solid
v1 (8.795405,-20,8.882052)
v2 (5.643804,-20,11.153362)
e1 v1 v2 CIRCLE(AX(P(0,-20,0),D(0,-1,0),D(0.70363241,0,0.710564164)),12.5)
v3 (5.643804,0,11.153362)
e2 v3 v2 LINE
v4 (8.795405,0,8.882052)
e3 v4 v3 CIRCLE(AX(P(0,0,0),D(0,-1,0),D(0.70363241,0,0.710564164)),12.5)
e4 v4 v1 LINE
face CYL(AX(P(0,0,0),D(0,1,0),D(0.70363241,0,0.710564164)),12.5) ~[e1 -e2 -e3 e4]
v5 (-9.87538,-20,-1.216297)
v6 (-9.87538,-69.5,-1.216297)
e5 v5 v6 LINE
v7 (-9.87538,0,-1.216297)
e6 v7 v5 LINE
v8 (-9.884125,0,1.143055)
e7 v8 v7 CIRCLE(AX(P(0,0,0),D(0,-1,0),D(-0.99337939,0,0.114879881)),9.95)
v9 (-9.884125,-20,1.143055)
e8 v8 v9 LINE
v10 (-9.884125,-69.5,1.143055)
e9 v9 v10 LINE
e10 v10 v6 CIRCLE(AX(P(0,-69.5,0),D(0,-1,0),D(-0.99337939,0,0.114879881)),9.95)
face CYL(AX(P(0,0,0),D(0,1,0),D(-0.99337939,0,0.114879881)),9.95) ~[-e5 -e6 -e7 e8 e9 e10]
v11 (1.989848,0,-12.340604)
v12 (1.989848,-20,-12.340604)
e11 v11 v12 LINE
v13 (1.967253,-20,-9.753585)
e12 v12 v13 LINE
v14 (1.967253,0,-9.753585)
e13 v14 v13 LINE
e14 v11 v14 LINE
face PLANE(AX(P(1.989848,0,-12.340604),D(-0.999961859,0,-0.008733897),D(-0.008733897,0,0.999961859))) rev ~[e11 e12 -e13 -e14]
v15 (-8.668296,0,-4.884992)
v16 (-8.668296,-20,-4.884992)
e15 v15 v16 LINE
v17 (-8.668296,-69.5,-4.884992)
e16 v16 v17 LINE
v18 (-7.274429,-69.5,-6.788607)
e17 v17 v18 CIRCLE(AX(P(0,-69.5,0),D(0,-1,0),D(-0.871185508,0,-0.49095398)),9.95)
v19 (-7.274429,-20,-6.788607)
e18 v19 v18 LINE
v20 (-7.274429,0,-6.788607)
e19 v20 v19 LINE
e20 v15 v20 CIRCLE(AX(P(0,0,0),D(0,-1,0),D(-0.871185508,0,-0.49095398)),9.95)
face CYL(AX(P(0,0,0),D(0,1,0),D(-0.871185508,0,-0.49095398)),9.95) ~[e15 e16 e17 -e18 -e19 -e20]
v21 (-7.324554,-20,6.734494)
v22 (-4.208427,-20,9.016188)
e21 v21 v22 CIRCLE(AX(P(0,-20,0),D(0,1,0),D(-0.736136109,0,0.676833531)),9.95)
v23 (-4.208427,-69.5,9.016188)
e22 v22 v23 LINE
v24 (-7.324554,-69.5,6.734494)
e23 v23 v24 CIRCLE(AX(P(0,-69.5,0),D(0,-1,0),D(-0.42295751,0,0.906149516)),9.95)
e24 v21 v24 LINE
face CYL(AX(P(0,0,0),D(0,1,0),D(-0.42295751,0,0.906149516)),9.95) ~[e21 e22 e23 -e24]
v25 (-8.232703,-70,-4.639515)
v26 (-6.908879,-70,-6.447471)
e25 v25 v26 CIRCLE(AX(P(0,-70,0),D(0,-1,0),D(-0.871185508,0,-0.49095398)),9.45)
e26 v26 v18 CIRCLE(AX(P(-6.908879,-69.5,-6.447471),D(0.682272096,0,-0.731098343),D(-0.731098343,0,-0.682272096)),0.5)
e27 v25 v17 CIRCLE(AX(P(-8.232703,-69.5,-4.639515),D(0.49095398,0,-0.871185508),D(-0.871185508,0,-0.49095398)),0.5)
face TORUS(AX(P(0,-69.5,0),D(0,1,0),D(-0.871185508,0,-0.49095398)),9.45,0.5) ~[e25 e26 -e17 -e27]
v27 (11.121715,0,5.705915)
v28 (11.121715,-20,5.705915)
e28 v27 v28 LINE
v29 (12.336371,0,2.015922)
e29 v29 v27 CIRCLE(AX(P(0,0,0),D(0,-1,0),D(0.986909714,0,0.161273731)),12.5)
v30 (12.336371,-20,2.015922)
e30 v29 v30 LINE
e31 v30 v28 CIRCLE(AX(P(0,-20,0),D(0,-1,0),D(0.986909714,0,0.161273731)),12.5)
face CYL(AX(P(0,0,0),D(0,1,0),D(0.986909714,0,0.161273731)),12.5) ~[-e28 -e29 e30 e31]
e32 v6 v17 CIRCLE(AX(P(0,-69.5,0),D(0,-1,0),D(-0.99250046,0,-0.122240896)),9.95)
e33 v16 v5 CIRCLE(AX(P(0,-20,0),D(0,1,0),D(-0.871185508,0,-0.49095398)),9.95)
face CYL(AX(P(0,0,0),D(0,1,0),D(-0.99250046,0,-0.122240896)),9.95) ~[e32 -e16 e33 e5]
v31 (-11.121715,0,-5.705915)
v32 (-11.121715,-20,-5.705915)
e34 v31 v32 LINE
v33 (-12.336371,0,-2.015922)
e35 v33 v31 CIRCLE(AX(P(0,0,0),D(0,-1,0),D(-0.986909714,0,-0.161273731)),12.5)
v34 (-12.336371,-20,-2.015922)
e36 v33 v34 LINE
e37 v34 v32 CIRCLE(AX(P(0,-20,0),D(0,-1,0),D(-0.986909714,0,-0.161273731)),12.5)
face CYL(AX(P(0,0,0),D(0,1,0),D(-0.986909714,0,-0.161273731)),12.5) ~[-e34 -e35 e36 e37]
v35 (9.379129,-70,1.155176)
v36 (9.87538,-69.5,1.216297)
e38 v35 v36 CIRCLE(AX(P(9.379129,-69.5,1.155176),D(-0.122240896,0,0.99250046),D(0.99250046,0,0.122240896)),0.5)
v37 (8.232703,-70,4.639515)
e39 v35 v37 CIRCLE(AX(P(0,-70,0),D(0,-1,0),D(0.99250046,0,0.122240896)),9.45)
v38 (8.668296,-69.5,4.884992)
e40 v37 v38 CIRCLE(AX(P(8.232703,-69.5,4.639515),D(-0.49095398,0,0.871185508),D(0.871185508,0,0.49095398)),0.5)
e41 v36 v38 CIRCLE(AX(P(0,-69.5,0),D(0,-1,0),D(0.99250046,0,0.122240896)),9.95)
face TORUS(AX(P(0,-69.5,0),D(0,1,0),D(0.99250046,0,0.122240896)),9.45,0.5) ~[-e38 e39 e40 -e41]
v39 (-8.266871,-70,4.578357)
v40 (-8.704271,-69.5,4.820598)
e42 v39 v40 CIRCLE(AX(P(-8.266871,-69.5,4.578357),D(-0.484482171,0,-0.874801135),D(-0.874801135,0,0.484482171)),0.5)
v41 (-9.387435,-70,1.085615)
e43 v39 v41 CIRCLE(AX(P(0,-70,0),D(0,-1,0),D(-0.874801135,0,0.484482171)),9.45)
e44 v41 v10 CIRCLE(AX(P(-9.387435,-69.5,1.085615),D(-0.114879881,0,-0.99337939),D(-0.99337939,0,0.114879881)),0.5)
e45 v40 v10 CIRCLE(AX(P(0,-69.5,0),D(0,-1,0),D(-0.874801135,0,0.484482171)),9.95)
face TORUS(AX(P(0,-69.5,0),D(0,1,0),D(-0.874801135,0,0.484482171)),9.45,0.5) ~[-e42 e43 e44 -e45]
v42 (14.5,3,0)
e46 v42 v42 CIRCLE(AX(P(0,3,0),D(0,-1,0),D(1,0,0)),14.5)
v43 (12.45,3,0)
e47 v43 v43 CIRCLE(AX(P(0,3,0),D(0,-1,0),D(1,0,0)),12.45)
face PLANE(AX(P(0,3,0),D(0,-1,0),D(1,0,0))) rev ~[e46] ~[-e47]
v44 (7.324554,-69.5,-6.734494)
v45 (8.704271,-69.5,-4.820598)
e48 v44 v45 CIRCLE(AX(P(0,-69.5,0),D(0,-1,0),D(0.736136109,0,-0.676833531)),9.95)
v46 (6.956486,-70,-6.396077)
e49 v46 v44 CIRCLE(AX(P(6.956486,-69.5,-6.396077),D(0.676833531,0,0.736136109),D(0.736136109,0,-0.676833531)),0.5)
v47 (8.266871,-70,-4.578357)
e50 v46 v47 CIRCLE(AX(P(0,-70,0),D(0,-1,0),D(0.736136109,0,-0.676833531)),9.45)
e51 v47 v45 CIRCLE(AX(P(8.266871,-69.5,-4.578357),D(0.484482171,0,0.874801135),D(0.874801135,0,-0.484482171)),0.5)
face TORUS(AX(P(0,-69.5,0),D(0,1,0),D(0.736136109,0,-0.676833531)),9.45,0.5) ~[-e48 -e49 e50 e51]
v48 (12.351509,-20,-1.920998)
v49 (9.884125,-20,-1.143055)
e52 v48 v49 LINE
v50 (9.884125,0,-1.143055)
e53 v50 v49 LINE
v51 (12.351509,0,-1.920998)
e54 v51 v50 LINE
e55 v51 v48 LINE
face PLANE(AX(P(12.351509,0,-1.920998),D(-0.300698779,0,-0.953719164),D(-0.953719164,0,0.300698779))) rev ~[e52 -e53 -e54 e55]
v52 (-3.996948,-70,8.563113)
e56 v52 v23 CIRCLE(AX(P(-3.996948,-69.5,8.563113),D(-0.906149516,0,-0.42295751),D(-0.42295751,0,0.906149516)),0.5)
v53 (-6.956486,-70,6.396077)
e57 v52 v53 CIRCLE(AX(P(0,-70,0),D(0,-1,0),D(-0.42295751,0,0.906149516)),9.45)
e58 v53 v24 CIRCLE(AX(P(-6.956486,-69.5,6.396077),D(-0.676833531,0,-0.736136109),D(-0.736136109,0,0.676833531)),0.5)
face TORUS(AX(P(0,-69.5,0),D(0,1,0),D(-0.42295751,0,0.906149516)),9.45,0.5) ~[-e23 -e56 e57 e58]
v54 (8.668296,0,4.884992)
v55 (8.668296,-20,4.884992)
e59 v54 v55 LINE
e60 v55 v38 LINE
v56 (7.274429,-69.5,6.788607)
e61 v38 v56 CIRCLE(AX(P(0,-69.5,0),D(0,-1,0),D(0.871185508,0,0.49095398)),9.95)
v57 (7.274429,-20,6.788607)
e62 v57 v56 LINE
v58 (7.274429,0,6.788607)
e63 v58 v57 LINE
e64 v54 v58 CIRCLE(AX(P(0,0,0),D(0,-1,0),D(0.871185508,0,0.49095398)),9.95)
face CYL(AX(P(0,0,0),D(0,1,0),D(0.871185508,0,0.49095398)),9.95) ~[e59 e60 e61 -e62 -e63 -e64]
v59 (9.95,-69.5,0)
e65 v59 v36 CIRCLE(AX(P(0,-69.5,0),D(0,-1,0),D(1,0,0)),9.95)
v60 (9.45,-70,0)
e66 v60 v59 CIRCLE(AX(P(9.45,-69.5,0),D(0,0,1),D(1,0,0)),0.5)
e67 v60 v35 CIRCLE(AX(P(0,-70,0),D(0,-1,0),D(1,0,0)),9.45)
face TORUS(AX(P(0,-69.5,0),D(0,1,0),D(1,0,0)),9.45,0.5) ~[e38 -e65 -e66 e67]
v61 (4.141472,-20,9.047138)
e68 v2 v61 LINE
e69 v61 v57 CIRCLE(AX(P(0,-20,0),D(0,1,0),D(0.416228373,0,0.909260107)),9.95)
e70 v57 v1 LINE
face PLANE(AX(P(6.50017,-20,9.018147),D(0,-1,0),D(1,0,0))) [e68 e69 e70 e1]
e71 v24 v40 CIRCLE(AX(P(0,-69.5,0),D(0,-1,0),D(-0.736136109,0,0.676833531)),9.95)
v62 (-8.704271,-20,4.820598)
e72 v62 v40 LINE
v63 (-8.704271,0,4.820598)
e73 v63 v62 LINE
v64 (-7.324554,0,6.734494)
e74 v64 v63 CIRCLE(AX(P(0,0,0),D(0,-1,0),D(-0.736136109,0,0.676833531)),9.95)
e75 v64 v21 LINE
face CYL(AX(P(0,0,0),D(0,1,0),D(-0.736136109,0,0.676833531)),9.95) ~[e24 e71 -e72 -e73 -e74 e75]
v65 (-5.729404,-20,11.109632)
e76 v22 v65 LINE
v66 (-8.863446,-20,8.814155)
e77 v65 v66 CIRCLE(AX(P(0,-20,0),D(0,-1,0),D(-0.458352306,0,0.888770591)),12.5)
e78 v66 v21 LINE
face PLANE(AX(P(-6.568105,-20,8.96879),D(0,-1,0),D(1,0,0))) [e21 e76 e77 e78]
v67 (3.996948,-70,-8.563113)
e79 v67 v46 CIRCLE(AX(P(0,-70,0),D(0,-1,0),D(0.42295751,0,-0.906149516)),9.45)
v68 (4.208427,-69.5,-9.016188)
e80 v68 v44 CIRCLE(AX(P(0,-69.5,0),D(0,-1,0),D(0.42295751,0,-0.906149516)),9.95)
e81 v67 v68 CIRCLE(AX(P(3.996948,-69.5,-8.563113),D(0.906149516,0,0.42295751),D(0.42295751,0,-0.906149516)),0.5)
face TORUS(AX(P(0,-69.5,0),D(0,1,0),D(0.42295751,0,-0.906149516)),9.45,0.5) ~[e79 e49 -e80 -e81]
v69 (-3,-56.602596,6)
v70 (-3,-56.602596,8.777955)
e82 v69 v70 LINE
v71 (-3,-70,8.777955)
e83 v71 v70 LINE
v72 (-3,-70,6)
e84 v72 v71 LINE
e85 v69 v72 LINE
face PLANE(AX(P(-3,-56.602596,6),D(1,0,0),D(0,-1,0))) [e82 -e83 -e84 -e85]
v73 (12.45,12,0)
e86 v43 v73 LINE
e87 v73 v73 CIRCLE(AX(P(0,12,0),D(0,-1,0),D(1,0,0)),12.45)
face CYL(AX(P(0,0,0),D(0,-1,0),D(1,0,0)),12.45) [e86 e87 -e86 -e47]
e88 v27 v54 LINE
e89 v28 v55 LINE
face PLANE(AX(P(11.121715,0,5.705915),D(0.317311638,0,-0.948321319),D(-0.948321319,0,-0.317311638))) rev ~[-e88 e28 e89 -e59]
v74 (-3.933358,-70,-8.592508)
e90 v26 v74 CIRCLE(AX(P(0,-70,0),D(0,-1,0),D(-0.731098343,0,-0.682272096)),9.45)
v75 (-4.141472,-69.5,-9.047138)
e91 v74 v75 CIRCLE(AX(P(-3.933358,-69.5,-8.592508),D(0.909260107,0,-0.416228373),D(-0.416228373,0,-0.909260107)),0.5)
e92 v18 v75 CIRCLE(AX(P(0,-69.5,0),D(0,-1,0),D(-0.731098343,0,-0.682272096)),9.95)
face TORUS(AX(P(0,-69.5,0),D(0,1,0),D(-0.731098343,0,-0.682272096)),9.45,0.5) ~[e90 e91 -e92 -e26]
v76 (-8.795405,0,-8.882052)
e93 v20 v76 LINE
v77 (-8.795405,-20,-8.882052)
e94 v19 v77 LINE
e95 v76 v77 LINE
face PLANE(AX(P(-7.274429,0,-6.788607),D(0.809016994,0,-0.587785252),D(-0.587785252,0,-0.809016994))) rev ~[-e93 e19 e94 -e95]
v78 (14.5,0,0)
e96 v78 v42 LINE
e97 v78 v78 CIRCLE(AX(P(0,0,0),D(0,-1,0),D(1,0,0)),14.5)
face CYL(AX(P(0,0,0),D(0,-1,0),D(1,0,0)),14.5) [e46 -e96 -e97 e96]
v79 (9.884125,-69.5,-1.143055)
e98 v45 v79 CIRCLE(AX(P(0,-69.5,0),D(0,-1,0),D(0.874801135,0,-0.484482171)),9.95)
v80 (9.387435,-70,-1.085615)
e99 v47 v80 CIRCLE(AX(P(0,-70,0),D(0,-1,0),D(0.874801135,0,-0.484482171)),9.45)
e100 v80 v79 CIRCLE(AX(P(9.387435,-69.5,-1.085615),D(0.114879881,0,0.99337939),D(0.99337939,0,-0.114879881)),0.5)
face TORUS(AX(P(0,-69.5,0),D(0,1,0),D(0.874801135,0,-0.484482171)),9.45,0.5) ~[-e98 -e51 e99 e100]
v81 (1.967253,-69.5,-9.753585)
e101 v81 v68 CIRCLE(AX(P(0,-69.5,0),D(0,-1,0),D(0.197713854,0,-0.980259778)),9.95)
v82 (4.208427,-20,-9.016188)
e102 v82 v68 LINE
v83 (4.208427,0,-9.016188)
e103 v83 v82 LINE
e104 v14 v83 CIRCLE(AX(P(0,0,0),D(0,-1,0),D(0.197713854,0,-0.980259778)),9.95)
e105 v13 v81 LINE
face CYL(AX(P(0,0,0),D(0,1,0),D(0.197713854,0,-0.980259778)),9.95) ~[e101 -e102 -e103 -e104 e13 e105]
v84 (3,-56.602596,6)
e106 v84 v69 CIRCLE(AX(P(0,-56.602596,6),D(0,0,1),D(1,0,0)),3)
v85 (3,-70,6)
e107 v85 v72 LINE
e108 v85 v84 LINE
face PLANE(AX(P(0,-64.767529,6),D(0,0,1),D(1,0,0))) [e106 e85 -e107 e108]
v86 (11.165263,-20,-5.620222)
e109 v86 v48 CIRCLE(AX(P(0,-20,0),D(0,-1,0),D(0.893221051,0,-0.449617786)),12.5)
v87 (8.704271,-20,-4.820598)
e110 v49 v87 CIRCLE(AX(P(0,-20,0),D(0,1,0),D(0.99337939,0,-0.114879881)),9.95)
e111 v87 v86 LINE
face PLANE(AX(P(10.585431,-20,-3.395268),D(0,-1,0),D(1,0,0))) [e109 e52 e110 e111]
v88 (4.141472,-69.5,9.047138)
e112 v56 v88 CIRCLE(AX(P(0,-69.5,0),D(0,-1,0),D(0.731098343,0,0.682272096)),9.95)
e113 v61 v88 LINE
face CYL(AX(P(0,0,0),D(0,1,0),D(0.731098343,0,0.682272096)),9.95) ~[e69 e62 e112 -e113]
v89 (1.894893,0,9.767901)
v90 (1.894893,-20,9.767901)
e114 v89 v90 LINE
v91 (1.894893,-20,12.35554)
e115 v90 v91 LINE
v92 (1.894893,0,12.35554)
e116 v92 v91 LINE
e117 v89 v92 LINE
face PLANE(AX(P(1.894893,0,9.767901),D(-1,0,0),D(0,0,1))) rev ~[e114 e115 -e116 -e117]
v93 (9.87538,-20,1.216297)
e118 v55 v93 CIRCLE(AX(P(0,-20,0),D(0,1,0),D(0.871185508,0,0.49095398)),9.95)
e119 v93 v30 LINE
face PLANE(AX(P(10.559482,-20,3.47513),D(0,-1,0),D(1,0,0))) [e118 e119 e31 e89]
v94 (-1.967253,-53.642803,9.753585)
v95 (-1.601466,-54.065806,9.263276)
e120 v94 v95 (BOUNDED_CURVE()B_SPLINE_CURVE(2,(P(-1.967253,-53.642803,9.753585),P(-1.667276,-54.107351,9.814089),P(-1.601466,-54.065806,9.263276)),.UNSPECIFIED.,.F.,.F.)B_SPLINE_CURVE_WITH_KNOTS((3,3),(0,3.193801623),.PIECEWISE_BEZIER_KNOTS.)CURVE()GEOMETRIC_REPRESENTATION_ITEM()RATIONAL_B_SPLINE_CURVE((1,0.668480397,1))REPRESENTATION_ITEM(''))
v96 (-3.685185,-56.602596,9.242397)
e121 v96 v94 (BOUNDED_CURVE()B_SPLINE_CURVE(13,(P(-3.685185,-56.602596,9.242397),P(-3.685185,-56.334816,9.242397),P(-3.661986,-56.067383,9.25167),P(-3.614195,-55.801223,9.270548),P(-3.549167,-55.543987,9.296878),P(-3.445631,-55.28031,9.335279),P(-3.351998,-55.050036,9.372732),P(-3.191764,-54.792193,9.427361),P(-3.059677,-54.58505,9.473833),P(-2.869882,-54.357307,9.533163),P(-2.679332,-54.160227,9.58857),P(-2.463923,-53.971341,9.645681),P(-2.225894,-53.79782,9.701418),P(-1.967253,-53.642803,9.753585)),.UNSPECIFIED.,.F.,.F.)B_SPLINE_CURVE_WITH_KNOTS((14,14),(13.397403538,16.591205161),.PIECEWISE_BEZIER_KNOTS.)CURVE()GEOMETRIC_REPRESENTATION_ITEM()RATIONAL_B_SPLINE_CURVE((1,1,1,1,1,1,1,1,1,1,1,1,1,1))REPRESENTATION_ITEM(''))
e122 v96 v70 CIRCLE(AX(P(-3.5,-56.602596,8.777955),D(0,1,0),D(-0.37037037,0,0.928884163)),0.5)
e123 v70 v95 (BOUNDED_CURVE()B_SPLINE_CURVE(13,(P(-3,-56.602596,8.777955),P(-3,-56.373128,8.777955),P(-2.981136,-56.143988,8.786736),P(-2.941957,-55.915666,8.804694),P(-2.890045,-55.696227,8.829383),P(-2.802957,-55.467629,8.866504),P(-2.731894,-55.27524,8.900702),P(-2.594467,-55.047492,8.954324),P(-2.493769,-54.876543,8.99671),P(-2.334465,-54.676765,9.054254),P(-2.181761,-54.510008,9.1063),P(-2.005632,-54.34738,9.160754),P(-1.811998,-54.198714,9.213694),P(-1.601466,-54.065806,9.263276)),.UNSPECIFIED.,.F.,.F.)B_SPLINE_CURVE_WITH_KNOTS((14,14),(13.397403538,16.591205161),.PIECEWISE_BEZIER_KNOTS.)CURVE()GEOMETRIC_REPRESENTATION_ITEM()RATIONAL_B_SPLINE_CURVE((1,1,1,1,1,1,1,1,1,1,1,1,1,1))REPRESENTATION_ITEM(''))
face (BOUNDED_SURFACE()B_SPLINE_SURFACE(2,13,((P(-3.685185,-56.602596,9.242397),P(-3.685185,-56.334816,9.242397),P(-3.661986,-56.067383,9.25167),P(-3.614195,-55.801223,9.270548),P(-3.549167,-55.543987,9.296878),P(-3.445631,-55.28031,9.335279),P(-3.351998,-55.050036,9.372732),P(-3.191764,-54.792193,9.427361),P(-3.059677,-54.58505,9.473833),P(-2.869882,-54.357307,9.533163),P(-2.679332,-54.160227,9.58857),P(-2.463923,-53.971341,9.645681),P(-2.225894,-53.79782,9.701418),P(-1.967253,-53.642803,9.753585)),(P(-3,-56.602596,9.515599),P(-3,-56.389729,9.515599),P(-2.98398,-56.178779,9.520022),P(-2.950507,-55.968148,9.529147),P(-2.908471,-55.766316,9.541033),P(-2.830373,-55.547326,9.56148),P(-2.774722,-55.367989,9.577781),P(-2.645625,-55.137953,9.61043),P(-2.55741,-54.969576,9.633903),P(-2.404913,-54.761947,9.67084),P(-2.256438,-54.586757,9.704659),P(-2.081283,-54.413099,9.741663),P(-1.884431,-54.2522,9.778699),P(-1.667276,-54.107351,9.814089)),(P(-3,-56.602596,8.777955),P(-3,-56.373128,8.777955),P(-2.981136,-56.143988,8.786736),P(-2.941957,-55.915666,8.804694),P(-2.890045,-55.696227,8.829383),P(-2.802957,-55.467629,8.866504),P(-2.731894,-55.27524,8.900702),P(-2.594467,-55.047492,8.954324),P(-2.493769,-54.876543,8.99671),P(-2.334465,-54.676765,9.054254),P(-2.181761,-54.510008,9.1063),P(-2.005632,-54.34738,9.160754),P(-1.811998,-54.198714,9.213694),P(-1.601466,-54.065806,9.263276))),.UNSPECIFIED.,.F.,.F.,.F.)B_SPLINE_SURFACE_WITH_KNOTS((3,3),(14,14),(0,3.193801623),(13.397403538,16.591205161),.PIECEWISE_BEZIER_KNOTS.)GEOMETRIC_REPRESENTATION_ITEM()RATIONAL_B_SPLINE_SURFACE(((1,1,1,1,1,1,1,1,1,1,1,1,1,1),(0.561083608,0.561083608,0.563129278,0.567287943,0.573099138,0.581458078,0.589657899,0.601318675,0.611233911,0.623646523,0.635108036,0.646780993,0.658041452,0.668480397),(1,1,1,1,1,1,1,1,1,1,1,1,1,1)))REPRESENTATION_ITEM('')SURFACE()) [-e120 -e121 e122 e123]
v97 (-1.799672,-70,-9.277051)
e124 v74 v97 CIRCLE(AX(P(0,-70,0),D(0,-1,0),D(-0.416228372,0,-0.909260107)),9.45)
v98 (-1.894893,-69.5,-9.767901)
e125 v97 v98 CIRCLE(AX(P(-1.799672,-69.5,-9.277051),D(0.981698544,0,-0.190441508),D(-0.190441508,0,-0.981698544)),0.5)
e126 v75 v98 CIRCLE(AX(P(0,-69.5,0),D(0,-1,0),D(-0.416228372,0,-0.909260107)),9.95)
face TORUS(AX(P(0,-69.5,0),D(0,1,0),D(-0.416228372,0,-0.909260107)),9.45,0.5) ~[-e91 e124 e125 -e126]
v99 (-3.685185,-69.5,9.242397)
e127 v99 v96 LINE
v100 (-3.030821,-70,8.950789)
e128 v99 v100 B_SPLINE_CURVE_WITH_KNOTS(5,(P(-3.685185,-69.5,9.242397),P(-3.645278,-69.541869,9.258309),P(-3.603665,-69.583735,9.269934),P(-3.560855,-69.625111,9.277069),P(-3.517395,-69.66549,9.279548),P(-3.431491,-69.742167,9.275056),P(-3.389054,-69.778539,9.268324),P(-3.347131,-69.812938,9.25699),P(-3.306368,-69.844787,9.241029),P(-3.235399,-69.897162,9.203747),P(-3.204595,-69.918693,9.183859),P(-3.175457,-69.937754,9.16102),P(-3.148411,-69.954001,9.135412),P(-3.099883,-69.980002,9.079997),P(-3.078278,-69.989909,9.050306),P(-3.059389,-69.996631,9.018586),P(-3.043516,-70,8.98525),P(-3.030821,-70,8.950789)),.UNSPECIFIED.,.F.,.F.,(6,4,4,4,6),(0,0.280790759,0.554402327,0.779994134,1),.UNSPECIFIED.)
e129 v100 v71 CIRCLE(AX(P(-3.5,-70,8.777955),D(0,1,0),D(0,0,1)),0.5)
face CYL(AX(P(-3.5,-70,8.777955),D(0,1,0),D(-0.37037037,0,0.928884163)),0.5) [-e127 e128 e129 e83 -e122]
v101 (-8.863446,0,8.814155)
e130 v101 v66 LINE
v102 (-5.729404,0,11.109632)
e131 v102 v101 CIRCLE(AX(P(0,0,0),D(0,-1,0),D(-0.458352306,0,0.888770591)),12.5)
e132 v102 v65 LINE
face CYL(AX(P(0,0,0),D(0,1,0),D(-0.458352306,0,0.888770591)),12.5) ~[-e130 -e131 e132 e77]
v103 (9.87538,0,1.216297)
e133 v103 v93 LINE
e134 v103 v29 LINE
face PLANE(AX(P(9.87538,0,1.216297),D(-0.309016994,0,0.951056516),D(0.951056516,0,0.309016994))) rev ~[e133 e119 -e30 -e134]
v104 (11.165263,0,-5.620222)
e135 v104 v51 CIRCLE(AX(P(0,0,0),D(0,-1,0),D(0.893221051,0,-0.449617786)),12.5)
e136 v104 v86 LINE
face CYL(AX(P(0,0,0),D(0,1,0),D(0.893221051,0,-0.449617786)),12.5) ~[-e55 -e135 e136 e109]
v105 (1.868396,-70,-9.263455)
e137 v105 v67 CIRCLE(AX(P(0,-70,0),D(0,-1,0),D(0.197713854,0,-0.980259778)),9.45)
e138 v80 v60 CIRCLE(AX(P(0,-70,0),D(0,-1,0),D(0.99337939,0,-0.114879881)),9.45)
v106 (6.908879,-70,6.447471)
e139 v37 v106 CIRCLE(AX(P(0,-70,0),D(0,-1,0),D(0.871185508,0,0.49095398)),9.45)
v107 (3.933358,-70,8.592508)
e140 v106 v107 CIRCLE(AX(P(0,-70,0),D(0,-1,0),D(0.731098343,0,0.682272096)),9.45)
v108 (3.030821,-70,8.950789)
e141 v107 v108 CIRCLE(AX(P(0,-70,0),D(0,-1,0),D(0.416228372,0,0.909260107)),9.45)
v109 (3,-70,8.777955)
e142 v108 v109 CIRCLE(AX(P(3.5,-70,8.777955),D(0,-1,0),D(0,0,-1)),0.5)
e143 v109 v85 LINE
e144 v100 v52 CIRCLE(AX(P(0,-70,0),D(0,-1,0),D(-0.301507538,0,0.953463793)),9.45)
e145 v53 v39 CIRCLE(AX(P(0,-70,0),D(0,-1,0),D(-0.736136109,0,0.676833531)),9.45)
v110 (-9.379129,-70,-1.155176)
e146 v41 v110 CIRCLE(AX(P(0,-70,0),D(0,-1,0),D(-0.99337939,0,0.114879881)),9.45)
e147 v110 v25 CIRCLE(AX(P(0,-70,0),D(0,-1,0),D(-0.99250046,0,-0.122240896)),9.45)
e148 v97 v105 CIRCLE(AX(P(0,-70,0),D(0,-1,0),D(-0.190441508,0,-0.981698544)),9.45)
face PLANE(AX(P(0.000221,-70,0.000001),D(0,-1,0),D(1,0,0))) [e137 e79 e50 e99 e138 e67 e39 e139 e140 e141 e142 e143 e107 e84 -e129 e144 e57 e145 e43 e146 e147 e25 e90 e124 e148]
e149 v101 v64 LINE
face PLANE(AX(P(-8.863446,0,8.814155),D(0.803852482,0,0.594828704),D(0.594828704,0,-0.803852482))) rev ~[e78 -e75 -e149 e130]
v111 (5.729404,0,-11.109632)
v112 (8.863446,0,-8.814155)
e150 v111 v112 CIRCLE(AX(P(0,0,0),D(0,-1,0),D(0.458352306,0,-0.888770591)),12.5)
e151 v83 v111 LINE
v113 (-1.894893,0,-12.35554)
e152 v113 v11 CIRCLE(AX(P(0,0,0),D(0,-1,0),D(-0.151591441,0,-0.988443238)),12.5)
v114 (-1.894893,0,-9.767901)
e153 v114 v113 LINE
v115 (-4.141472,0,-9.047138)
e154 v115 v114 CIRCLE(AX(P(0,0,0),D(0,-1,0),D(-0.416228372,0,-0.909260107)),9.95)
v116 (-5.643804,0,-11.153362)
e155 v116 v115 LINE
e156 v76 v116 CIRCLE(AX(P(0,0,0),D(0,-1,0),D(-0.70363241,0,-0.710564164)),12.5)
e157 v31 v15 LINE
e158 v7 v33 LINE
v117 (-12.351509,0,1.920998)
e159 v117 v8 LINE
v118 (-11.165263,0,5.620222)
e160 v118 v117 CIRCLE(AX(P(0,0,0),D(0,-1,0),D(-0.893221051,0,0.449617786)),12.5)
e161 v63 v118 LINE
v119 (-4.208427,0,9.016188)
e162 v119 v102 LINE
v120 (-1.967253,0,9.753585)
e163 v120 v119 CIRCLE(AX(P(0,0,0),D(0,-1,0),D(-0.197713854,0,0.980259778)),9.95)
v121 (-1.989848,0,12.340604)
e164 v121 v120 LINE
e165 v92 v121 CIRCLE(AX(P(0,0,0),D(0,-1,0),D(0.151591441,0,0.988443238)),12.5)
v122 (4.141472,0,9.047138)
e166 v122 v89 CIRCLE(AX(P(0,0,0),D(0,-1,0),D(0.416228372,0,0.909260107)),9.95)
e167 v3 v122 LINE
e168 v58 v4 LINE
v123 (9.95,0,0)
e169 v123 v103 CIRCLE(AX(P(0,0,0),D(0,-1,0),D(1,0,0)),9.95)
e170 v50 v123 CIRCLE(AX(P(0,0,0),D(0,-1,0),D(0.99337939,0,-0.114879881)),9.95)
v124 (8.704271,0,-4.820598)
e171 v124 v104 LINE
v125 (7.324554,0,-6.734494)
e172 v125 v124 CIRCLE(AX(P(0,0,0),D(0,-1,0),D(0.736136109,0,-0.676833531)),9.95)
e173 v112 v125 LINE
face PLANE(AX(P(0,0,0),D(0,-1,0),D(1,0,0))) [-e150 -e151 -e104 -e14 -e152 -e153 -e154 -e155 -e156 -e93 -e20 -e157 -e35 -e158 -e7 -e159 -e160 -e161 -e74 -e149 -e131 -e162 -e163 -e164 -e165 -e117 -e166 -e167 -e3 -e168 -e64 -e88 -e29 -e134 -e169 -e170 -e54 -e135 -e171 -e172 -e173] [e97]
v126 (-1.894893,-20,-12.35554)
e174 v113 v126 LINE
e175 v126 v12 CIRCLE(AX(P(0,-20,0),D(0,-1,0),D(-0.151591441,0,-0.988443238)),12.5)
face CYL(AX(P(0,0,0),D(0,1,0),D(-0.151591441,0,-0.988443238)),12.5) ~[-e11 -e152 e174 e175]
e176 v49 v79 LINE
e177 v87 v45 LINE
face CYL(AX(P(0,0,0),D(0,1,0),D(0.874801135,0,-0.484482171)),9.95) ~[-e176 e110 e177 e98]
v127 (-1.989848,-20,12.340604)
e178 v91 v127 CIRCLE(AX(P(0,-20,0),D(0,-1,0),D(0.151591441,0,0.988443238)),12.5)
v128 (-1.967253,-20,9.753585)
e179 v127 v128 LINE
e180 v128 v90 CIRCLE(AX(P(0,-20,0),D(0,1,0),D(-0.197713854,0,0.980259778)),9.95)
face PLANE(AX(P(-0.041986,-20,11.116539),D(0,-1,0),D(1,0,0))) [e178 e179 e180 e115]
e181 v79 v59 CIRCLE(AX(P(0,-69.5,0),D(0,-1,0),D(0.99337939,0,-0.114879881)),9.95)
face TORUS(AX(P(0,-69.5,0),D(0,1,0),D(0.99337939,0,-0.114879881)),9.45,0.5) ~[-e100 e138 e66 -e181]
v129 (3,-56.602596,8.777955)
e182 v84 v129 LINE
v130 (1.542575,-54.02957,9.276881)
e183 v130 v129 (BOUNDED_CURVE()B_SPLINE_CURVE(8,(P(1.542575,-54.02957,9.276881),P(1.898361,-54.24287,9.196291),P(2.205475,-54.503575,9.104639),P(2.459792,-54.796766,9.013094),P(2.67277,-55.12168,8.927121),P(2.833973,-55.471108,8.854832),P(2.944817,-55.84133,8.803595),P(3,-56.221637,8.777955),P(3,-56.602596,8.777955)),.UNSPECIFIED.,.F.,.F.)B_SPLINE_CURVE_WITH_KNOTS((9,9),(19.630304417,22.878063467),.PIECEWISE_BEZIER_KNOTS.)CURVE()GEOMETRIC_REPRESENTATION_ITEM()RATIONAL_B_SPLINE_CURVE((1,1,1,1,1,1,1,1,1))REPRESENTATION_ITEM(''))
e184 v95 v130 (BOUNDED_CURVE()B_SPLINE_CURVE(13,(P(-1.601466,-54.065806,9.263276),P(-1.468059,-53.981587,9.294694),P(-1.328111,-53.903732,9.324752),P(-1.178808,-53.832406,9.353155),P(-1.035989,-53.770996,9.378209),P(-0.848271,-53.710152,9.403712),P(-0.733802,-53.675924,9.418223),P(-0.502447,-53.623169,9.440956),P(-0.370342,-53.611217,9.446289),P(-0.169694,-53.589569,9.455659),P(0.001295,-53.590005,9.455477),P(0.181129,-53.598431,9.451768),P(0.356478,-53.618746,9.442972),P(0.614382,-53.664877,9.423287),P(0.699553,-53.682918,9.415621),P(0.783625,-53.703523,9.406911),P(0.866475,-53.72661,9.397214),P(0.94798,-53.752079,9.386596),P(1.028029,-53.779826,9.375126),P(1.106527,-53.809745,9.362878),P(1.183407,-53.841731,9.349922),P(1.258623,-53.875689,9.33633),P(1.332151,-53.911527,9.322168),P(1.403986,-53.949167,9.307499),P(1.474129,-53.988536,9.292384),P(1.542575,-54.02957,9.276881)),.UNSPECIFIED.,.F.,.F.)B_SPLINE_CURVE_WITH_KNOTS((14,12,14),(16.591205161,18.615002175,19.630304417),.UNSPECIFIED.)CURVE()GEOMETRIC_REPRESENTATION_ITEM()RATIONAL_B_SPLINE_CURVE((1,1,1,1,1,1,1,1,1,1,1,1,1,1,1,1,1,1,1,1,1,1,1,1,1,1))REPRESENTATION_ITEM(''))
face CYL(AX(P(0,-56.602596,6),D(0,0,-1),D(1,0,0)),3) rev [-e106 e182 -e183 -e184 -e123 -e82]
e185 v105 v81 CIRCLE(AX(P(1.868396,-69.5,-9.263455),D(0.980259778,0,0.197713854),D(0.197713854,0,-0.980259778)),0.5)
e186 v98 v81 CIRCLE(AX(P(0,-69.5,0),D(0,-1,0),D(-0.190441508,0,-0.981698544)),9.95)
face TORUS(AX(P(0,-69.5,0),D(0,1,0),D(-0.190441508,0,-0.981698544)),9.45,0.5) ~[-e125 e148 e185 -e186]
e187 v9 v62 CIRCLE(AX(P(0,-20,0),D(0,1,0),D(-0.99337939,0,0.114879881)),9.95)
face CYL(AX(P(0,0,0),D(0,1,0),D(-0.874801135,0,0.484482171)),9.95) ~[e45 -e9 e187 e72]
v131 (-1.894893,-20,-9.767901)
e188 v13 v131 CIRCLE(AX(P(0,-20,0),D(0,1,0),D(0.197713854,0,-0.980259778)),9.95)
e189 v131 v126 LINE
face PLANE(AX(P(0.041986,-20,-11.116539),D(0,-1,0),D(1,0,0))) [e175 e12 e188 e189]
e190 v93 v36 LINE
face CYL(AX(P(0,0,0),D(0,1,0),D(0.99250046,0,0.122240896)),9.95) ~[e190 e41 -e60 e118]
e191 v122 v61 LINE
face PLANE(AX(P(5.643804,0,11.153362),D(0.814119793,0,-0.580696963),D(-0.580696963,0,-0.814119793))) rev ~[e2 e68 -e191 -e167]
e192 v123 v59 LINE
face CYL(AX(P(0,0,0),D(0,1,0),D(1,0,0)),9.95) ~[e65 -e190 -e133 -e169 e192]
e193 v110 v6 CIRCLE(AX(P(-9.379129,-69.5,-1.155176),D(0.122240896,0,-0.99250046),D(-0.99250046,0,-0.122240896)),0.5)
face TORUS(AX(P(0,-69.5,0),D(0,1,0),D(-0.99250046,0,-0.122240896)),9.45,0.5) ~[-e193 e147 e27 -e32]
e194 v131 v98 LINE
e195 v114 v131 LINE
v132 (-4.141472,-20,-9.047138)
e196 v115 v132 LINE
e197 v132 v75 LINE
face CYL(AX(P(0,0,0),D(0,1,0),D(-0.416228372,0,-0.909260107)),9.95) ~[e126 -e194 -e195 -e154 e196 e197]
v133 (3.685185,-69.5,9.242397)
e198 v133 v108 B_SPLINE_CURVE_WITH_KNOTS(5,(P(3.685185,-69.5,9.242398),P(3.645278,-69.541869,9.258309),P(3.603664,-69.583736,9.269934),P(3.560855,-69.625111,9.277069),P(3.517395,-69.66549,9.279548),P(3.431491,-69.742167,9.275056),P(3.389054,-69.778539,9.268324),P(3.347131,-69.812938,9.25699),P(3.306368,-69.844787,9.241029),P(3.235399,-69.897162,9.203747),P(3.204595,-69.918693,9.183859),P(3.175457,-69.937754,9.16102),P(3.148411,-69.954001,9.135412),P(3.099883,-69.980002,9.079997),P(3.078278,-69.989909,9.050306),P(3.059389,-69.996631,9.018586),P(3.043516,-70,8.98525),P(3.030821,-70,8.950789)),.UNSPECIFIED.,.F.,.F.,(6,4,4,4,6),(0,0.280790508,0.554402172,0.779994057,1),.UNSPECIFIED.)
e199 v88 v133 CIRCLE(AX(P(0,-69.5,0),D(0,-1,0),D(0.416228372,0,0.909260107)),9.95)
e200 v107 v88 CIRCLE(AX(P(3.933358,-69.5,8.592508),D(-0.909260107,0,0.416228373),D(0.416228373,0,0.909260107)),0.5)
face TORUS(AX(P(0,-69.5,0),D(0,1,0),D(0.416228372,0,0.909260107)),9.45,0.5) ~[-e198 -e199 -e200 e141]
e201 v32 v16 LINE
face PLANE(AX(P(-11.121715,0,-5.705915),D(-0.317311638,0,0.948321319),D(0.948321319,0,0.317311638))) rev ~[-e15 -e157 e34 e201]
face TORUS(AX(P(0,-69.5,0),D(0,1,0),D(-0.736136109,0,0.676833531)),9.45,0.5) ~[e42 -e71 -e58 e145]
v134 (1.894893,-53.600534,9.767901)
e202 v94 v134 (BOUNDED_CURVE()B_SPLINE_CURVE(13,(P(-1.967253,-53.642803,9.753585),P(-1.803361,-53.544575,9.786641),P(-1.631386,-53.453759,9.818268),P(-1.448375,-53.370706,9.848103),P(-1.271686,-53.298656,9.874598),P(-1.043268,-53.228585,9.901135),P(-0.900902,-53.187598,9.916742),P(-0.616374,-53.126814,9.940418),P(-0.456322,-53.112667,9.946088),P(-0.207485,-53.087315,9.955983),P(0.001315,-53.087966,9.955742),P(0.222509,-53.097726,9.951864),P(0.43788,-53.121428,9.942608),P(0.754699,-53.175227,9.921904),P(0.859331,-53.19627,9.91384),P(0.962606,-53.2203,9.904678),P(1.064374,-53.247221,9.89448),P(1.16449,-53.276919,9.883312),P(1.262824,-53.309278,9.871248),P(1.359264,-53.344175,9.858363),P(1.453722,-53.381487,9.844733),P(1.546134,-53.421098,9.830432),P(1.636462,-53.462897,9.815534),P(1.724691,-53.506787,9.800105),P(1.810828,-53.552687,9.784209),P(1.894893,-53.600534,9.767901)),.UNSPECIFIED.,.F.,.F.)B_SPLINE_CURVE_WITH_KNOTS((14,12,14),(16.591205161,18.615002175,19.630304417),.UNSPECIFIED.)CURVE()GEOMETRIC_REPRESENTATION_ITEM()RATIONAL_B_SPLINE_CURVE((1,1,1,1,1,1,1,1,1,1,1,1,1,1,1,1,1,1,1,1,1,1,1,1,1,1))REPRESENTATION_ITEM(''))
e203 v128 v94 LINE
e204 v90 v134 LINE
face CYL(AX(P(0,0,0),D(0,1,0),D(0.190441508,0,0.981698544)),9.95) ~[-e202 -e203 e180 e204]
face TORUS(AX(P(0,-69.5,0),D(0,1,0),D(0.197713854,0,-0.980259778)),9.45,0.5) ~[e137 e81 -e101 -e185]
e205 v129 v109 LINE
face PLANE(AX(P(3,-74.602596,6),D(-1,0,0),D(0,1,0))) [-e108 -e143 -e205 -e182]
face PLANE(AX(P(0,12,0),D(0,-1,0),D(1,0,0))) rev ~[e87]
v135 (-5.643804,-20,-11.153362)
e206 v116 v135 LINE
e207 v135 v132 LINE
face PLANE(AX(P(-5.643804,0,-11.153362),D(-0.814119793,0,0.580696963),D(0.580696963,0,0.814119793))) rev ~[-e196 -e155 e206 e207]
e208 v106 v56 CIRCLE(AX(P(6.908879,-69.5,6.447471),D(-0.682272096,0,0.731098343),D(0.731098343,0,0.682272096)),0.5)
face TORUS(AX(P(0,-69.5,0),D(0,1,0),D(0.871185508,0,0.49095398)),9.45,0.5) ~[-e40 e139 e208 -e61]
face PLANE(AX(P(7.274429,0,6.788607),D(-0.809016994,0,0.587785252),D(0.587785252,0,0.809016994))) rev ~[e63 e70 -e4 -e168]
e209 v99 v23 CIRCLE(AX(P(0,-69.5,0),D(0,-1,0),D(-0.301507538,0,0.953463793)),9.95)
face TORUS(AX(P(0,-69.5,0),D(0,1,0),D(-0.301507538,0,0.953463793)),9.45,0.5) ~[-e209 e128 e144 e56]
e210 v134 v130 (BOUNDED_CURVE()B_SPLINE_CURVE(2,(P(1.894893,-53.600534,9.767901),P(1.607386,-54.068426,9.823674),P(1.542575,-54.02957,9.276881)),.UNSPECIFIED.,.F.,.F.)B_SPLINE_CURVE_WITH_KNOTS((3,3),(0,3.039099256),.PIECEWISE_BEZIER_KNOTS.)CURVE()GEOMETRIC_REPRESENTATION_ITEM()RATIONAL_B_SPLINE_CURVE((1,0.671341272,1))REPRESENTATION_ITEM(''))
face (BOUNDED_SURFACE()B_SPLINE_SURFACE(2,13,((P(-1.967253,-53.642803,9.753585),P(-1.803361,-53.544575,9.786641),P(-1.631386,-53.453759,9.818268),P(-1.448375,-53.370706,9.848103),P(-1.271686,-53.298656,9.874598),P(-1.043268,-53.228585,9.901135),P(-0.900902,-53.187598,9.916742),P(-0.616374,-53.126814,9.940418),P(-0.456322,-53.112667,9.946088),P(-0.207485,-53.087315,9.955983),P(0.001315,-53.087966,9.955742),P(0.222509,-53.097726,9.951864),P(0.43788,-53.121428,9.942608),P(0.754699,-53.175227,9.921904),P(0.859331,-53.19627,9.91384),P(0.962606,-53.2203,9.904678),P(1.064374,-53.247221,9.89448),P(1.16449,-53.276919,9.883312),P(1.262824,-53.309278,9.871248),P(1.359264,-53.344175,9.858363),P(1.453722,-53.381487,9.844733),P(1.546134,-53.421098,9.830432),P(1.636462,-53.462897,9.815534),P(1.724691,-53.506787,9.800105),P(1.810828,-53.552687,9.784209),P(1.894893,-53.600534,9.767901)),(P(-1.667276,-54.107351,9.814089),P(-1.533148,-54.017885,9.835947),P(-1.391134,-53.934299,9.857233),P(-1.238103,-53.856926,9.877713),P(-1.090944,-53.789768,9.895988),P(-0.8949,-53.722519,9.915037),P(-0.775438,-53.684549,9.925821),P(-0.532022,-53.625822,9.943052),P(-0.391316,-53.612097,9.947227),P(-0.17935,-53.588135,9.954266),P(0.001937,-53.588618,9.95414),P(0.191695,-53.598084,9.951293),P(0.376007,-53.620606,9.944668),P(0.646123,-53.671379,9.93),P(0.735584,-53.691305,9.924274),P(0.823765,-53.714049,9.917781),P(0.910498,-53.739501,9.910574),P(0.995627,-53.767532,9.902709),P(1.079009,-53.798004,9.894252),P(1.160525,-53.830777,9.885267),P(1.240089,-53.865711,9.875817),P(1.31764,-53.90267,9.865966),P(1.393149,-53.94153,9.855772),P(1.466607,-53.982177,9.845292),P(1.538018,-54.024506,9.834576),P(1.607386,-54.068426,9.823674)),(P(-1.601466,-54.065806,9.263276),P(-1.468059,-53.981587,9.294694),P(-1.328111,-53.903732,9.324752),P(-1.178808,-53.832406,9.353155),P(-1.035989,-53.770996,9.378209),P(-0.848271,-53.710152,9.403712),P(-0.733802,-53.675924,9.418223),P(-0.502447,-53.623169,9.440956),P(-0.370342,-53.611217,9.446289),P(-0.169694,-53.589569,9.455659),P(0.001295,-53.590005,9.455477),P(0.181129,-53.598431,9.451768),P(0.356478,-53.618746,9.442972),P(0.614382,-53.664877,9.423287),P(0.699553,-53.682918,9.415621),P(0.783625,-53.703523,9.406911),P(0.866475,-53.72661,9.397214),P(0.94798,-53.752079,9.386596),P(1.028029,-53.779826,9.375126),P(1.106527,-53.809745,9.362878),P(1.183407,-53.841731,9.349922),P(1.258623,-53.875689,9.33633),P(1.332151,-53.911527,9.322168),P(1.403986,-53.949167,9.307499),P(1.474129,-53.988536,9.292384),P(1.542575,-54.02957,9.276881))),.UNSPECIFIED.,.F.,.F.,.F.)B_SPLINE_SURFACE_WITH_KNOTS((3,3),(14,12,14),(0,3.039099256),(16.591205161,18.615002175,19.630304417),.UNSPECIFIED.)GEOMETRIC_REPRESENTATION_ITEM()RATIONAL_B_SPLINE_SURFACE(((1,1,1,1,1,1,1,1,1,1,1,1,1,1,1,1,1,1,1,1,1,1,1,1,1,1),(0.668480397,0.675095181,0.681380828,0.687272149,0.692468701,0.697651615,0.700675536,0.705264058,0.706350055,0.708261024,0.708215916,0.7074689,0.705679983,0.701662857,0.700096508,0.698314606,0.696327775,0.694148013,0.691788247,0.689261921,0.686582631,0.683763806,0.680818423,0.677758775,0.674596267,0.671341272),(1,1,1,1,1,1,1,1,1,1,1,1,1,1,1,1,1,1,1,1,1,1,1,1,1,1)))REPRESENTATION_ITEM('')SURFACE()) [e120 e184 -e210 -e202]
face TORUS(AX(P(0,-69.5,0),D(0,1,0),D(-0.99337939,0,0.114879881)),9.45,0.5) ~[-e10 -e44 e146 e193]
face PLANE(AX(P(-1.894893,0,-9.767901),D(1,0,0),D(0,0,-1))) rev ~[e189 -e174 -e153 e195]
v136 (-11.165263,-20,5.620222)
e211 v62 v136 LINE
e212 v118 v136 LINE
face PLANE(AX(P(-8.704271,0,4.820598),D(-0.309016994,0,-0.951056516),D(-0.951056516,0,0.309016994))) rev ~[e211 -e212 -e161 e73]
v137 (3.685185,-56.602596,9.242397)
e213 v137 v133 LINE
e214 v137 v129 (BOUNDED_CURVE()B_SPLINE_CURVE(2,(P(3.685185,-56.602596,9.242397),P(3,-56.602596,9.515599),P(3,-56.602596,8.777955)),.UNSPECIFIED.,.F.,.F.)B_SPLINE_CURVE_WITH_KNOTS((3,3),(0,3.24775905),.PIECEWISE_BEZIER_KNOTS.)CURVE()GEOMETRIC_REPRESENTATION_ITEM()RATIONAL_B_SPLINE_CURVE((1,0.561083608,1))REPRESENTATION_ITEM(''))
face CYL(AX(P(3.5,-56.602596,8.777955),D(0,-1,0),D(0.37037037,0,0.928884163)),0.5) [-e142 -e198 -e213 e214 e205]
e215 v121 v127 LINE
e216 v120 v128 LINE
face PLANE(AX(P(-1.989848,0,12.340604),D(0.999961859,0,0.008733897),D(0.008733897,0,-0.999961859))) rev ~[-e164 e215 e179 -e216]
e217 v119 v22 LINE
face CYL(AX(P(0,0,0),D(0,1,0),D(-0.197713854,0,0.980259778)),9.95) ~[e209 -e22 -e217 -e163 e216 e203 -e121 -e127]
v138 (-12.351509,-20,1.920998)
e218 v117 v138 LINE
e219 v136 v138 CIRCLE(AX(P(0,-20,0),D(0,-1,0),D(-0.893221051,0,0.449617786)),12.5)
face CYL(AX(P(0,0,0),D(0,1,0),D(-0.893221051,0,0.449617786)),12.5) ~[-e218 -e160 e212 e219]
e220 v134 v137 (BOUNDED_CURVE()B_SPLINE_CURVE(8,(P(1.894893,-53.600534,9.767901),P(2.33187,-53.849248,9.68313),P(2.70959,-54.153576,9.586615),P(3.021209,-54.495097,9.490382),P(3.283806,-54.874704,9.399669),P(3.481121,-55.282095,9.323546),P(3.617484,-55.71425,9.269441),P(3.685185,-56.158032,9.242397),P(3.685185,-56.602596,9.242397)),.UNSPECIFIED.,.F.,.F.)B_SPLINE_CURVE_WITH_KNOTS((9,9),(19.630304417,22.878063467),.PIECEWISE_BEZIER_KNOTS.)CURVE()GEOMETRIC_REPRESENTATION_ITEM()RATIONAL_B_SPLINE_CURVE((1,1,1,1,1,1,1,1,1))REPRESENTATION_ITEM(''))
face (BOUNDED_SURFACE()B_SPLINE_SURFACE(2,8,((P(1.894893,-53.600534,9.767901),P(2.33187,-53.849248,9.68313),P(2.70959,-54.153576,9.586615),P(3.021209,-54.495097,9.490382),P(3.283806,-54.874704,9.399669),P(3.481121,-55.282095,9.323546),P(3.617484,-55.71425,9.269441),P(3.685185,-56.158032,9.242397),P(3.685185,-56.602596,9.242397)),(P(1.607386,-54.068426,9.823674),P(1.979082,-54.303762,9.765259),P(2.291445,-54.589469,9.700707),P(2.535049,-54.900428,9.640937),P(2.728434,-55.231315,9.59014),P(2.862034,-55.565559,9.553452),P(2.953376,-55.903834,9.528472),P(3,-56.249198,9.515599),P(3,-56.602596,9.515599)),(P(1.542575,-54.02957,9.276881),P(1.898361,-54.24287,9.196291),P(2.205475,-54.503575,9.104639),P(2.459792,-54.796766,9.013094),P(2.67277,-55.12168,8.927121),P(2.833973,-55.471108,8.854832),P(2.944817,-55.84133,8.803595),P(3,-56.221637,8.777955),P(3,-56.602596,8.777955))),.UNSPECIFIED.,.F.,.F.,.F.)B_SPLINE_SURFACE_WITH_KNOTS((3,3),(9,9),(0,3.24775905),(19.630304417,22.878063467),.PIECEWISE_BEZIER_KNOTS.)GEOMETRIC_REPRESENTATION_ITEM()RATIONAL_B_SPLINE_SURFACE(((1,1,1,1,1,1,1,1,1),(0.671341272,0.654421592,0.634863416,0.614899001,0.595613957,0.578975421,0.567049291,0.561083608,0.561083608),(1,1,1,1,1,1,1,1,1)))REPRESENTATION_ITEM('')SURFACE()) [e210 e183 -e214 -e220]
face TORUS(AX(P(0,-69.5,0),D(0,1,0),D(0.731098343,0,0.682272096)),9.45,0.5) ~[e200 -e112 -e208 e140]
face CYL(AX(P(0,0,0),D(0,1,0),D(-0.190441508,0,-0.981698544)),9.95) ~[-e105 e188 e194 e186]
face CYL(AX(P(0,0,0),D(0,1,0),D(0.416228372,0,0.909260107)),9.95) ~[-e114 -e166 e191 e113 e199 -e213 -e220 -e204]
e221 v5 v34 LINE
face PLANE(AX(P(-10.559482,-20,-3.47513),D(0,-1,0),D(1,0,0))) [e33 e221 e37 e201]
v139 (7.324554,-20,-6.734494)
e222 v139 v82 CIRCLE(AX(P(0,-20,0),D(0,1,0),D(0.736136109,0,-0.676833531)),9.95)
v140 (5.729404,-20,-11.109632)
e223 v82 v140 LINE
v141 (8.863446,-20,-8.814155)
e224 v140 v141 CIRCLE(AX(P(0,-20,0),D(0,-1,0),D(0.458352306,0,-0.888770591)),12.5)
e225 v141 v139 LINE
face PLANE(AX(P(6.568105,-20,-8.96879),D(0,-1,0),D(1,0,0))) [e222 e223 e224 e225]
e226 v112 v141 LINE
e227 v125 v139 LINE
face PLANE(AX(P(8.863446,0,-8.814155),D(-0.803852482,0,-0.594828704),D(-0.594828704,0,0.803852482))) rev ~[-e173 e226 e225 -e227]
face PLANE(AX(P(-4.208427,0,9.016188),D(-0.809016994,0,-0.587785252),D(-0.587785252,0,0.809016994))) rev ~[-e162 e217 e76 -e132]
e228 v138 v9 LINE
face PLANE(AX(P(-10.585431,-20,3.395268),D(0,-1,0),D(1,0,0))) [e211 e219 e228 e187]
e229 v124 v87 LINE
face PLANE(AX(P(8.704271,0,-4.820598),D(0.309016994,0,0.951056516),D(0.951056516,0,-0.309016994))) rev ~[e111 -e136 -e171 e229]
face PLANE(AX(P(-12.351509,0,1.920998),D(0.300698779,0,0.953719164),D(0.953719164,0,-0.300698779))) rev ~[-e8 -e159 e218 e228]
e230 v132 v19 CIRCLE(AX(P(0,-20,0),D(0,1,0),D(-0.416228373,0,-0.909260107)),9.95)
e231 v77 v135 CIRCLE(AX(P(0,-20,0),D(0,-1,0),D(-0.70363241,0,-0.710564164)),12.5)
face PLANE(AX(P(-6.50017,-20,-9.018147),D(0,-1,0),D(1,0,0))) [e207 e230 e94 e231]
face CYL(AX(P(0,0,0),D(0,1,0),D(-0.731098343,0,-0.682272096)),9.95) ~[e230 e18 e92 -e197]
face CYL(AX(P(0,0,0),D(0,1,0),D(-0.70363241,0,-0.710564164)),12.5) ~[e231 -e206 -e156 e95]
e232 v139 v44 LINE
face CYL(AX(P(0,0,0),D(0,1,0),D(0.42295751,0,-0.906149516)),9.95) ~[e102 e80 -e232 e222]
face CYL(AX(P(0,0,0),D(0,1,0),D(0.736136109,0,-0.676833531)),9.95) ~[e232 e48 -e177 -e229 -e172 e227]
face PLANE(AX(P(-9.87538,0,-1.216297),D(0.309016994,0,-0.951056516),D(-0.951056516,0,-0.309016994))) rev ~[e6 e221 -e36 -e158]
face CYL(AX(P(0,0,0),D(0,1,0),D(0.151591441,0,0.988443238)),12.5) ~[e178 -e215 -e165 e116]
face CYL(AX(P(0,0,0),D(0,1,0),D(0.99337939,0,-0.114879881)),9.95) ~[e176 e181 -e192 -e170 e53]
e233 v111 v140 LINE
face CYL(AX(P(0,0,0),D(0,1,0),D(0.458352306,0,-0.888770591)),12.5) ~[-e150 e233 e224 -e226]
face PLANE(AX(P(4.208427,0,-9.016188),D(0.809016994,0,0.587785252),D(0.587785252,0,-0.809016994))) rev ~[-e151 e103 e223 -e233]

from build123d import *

# Parameters (mm, degrees)
F1_R     = 14.5
F1_R_2   = 12.45
F2_DEPTH = 3
F3_DEPTH = 12
F4_DEPTH = 20
F5_DEPTH = 70
F8_DEPTH = 25
F9_R     = 0.5


with BuildPart() as f2:
    # F1 (on Front) → F2 (new body)
    with BuildSketch(Plane.XZ):
        Circle(F1_R)
        Circle(F1_R_2, mode=Mode.SUBTRACT)
    extrude(amount=-F2_DEPTH)

    # F1 (on Front) → F3 (join)
    with BuildSketch(Plane.XZ):
        Circle(F1_R_2)
    extrude(amount=-F3_DEPTH)

    # F0 (on Front) → F4 (join)
    with BuildSketch(Plane.XZ):
        with BuildLine():
            ThreePointArc((-7.324554284, 6.7344936366), (-5.8782605878, 8.0279855793), (-4.2084272228, 9.0161876816))
            Line((-4.2084272228, 9.0161876816), (-5.7294038305, 11.1096323858))
            ThreePointArc((-5.7294038305, 11.1096323858), (-7.3861439392, 10.0843878203), (-8.8634461682, 8.8141546403))
            Line((-8.8634461682, 8.8141546403), (-7.324554284, 6.7344936366))
        make_face()
        with BuildLine():
            ThreePointArc((-1.9672528507, 9.7535847882), (-0.0368811837, 9.9499316469), (1.8948930083, 9.7679005158))
            Line((1.8948930083, 9.7679005158), (1.8948930083, 12.3555404773))
            ThreePointArc((1.8948930083, 12.3555404773), (-0.0480615306, 12.4999076032), (-1.9898484698, 12.3406038372))
            Line((-1.9898484698, 12.3406038372), (-1.9672528507, 9.7535847882))
        make_face()
        with BuildLine():
            ThreePointArc((4.141472307, 9.047138063), (5.818585579, 8.0713420111), (7.2744285153, 6.7886073517))
            Line((7.2744285153, 6.7886073517), (8.7954051229, 8.8820520559))
            ThreePointArc((8.7954051229, 8.8820520559), (7.3083787492, 10.140887538), (5.6438037116, 11.15336181))
            Line((5.6438037116, 11.15336181), (4.141472307, 9.047138063))
        make_face()
        with BuildLine():
            ThreePointArc((8.668295807, 4.8849920985), (9.4515504169, 3.1097740619), (9.8753795782, 1.2162969155))
            Line((9.8753795782, 1.2162969155), (12.3363714254, 2.015921639))
            ThreePointArc((12.3363714254, 2.015921639), (11.8732667494, 3.9083931094), (11.121714701, 5.7059146602))
            Line((11.121714701, 5.7059146602), (8.668295807, 4.8849920985))
        make_face()
        with BuildLine():
            Line((12.3515086878, -1.9209979529), (9.8841249332, -1.1430548127))
            ThreePointArc((9.8841249332, -1.1430548127), (9.474344242, -3.0396218816), (8.704271294, -4.820597602))
            Line((8.704271294, -4.820597602), (11.1652631412, -5.6202223254))
            ThreePointArc((11.1652631412, -5.6202223254), (11.9029704089, -3.8169746457), (12.3515086878, -1.9209979529))
        make_face()
        with BuildLine():
            Line((8.8634461682, -8.8141546403), (7.324554284, -6.7344936366))
            ThreePointArc((7.324554284, -6.7344936366), (5.8782605878, -8.0279855793), (4.2084272228, -9.0161876816))
            Line((4.2084272228, -9.0161876816), (5.7294038305, -11.1096323858))
            ThreePointArc((5.7294038305, -11.1096323858), (7.3861439392, -10.0843878203), (8.8634461682, -8.8141546403))
        make_face()
        with BuildLine():
            Line((1.9898484698, -12.3406038372), (1.9672528507, -9.7535847882))
            ThreePointArc((1.9672528507, -9.7535847882), (0.0368811837, -9.9499316469), (-1.8948930083, -9.7679005158))
            Line((-1.8948930083, -9.7679005158), (-1.8948930083, -12.3555404773))
            ThreePointArc((-1.8948930083, -12.3555404773), (0.0480615306, -12.4999076032), (1.9898484698, -12.3406038372))
        make_face()
        with BuildLine():
            Line((-5.6438037116, -11.15336181), (-4.141472307, -9.047138063))
            ThreePointArc((-4.141472307, -9.047138063), (-5.818585579, -8.0713420111), (-7.2744285153, -6.7886073517))
            Line((-7.2744285153, -6.7886073517), (-8.7954051229, -8.8820520559))
            ThreePointArc((-8.7954051229, -8.8820520559), (-7.3083787492, -10.140887538), (-5.6438037116, -11.15336181))
        make_face()
        with BuildLine():
            Line((-11.121714701, -5.7059146602), (-8.668295807, -4.8849920985))
            ThreePointArc((-8.668295807, -4.8849920985), (-9.4515504169, -3.1097740619), (-9.8753795782, -1.2162969155))
            Line((-9.8753795782, -1.2162969155), (-12.3363714254, -2.015921639))
            ThreePointArc((-12.3363714254, -2.015921639), (-11.8732667494, -3.9083931094), (-11.121714701, -5.7059146602))
        make_face()
        with BuildLine():
            ThreePointArc((-9.8841249332, 1.1430548127), (-9.474344242, 3.0396218816), (-8.704271294, 4.820597602))
            Line((-8.704271294, 4.820597602), (-11.1652631412, 5.6202223254))
            ThreePointArc((-11.1652631412, 5.6202223254), (-11.9029704089, 3.8169746457), (-12.3515086878, 1.9209979529))
            Line((-12.3515086878, 1.9209979529), (-9.8841249332, 1.1430548127))
        make_face()
    extrude(amount=F4_DEPTH)

    # F0 (on Front) → F5 (join)
    with BuildSketch(Plane.XZ):
        with BuildLine():
            ThreePointArc((9.8841249332, -1.1430548127), (9.9335175815, -0.5724757264), (9.95, 0))
            ThreePointArc((9.95, 0), (9.9313273736, 0.6092918829), (9.8753795782, 1.2162969155))
            ThreePointArc((9.8753795782, 1.2162969155), (9.4515504169, 3.1097740619), (8.668295807, 4.8849920985))
            ThreePointArc((8.668295807, 4.8849920985), (8.0279855793, 5.8782605878), (7.2744285153, 6.7886073517))
            ThreePointArc((7.2744285153, 6.7886073517), (5.818585579, 8.0713420111), (4.141472307, 9.047138063))
            ThreePointArc((4.141472307, 9.047138063), (3.0396218816, 9.474344242), (1.8948930083, 9.7679005158))
            ThreePointArc((1.8948930083, 9.7679005158), (-0.0368811837, 9.9499316469), (-1.9672528507, 9.7535847882))
            ThreePointArc((-1.9672528507, 9.7535847882), (-3.1097740619, 9.4515504169), (-4.2084272228, 9.0161876816))
            ThreePointArc((-4.2084272228, 9.0161876816), (-5.8782605878, 8.0279855793), (-7.324554284, 6.7344936366))
            ThreePointArc((-7.324554284, 6.7344936366), (-8.0713420111, 5.818585579), (-8.704271294, 4.820597602))
            ThreePointArc((-8.704271294, 4.820597602), (-9.474344242, 3.0396218816), (-9.8841249332, 1.1430548127))
            ThreePointArc((-9.8841249332, 1.1430548127), (-9.9499316469, -0.0368811837), (-9.8753795782, -1.2162969155))
            ThreePointArc((-9.8753795782, -1.2162969155), (-9.4515504169, -3.1097740619), (-8.668295807, -4.8849920985))
            ThreePointArc((-8.668295807, -4.8849920985), (-8.0279855793, -5.8782605878), (-7.2744285153, -6.7886073517))
            ThreePointArc((-7.2744285153, -6.7886073517), (-5.818585579, -8.0713420111), (-4.141472307, -9.047138063))
            ThreePointArc((-4.141472307, -9.047138063), (-3.0396218816, -9.474344242), (-1.8948930083, -9.7679005158))
            ThreePointArc((-1.8948930083, -9.7679005158), (0.0368811837, -9.9499316469), (1.9672528507, -9.7535847882))
            ThreePointArc((1.9672528507, -9.7535847882), (3.1097740619, -9.4515504169), (4.2084272228, -9.0161876816))
            ThreePointArc((4.2084272228, -9.0161876816), (5.8782605878, -8.0279855793), (7.324554284, -6.7344936366))
            ThreePointArc((7.324554284, -6.7344936366), (8.0713420111, -5.818585579), (8.704271294, -4.820597602))
            ThreePointArc((8.704271294, -4.820597602), (9.474344242, -3.0396218816), (9.8841249332, -1.1430548127))
        make_face()
    extrude(amount=F5_DEPTH)

    # F7 (on offset) → F8 (cut)
    with BuildSketch(Plane.XY.offset(6)):
        with BuildLine():
            Line((-3, -74.6025964618), (0, -74.6025964618))
            Line((0, -74.6025964618), (3, -74.6025964618))
            Line((3, -74.6025964618), (3, -56.6025964618))
            ThreePointArc((3, -56.6025964618), (0, -53.6025964618), (-3, -56.6025964618))
            Line((-3, -56.6025964618), (-3, -74.6025964618))
        make_face()
    extrude(amount=F8_DEPTH, mode=Mode.SUBTRACT)

    # F9
    f9_edges = [f2.edges().sort_by_distance(p)[0] for p in [
        (-3, -63.301298, 9.486965),
        (0, -53.602596, 9.95),
        (3, -63.301298, 9.486965),
        (-5.377611, -70, -8.371607),
        (7.65146, -70, 6.360634),
    ]]
    fillet(f9_edges, radius=F9_R)


solid = f2.part
